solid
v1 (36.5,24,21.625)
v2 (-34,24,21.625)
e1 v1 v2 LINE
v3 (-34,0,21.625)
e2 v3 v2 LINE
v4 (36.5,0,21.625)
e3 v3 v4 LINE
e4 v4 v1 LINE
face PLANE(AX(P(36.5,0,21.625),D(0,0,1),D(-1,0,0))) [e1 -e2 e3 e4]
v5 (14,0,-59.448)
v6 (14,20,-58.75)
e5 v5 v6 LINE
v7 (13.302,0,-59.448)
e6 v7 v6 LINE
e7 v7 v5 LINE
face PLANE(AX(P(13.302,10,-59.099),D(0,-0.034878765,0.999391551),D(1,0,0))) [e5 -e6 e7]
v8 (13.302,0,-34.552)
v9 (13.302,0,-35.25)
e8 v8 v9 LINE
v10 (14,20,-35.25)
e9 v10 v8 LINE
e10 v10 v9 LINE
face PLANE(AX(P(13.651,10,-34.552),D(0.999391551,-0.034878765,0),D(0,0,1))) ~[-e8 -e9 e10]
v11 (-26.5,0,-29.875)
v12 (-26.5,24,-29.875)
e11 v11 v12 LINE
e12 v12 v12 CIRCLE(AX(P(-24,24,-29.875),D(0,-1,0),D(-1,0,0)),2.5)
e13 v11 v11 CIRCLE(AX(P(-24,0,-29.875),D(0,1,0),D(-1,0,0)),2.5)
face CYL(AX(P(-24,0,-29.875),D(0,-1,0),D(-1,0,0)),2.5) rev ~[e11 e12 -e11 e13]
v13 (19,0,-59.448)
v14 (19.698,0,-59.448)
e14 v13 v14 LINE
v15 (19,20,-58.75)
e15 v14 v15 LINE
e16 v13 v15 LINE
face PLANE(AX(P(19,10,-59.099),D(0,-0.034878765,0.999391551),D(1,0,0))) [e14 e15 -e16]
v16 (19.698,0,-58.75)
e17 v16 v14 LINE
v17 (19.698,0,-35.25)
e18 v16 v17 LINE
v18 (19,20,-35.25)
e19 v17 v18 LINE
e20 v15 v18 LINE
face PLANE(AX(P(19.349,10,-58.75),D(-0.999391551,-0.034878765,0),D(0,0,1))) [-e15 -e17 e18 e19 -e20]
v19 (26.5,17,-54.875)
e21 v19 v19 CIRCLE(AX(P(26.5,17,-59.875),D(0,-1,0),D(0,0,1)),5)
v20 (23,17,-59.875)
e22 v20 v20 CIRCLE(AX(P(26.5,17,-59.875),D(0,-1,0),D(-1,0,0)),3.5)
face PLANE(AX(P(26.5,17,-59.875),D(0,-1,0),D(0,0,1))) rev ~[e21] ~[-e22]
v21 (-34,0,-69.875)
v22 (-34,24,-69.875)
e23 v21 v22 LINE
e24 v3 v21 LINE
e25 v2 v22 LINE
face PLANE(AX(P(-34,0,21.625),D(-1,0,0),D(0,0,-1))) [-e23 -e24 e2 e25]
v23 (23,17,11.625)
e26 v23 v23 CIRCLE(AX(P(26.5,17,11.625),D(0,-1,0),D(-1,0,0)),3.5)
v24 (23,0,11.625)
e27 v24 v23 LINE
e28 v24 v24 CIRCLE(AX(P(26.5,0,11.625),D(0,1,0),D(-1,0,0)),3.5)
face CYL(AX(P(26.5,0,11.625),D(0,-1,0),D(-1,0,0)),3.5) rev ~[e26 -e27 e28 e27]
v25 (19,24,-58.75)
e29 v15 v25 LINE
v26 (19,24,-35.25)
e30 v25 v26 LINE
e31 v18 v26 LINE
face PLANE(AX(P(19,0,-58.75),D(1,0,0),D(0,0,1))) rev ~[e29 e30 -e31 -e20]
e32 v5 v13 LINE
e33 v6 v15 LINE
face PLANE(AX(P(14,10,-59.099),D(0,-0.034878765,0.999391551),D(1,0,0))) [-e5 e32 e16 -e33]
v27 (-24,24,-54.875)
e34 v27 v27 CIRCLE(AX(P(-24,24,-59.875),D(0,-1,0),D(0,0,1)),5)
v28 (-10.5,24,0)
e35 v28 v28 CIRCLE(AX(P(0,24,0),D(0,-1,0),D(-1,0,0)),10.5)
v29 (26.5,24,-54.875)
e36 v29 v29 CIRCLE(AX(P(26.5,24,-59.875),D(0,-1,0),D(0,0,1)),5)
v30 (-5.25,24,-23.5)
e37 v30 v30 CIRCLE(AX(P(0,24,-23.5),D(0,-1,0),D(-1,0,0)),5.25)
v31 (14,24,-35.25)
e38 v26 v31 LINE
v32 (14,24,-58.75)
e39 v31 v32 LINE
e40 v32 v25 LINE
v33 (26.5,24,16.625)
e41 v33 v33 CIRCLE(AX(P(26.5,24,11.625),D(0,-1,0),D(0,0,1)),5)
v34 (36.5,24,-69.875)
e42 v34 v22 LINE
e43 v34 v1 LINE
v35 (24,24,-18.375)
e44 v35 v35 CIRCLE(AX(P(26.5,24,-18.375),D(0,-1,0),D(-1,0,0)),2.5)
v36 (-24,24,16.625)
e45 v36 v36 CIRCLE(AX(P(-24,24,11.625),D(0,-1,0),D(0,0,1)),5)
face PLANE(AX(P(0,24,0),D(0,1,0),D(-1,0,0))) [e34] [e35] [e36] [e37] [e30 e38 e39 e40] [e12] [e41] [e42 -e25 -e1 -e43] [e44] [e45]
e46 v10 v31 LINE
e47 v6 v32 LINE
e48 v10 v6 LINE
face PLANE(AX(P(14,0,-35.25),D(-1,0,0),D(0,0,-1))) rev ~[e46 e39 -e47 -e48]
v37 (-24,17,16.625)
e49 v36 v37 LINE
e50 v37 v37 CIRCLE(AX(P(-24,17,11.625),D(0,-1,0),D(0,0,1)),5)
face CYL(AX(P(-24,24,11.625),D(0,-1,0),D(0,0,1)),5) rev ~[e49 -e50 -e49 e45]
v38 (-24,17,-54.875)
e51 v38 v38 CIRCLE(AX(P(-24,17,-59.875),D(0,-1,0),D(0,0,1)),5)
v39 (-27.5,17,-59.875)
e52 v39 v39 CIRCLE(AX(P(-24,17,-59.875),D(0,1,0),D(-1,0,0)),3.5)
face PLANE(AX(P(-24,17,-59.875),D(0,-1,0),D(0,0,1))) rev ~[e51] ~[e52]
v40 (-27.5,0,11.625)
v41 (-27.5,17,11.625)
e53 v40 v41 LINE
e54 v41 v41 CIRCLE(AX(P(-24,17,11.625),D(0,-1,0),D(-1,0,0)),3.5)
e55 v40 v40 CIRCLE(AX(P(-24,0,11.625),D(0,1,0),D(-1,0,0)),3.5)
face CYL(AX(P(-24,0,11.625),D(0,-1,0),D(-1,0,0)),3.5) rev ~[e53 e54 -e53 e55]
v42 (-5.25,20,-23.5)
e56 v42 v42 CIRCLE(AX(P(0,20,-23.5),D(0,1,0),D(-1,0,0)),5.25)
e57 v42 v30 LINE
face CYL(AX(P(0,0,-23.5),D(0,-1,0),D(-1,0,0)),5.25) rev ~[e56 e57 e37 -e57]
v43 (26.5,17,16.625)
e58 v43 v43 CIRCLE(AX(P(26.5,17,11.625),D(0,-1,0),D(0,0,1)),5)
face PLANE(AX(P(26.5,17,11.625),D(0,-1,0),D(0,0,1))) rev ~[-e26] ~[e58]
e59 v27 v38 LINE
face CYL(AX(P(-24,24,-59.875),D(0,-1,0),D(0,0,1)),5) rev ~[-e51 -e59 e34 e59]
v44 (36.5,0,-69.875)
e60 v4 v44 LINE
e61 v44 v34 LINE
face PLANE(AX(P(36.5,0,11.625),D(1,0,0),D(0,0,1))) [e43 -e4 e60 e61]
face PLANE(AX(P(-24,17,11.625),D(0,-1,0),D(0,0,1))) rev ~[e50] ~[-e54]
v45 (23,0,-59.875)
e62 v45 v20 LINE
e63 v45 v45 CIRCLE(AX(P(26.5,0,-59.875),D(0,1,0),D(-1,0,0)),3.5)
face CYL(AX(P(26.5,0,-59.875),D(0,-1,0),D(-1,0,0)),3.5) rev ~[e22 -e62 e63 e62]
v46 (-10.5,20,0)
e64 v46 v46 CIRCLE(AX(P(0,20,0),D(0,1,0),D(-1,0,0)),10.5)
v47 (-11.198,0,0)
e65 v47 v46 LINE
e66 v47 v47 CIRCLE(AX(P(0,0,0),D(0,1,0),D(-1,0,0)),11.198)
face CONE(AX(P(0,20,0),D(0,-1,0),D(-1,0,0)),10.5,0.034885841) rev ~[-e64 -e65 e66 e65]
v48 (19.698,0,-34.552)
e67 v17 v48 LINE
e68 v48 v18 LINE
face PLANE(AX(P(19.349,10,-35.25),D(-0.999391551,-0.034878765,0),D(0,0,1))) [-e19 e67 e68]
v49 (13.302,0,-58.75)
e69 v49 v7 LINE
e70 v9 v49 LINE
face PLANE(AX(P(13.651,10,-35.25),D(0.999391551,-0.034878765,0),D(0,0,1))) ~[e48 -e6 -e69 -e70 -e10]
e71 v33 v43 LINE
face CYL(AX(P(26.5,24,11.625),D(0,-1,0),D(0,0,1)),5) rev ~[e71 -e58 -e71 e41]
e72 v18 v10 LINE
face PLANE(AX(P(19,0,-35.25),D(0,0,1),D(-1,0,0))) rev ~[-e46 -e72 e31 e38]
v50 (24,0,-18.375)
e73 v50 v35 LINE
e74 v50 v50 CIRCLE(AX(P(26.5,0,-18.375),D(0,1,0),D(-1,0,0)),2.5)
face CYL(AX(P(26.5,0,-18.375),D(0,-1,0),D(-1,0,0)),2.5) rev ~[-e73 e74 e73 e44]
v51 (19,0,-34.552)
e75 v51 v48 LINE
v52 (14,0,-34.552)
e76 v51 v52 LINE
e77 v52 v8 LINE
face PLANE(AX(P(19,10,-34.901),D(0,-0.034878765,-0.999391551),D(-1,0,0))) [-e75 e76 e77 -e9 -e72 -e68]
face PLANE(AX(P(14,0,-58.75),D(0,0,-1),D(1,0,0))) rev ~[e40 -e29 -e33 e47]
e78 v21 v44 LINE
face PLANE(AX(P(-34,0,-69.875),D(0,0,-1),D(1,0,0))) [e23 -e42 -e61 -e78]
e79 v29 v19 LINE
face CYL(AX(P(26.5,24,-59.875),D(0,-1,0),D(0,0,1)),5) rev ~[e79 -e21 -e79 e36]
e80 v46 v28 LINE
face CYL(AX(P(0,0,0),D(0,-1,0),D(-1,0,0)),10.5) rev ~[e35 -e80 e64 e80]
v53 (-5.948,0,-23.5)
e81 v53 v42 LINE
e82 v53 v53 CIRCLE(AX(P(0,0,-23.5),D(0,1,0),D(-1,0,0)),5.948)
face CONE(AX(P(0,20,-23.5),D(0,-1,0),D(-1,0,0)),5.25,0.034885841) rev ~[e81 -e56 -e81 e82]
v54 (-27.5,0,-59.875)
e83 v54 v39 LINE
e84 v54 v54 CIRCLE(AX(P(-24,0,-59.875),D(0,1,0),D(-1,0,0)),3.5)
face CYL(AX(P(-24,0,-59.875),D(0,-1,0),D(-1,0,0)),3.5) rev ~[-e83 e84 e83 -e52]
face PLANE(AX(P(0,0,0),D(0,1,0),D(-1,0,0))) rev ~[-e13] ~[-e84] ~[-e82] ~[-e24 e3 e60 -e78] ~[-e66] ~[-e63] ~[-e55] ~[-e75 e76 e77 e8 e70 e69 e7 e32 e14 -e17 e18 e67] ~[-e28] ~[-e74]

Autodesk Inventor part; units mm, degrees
ref_plane "YZ Plane" through (0, 0, 0) normal (1, 0, 0) x (0, 1, 0)
ref_plane "XZ Plane" through (0, 0, 0) normal (0, 1, 0) x (-1, 0, 0)
ref_plane "XY Plane" through (0, 0, 0) normal (0, 0, 1) x (1, 0, 0)
sketch "Sketch1" plane through (0, 0, 0) normal (0, 1, 0) x (-1, 0, 0)
  circle A0 centre (0, 0) radius 10.5
  line L0 (0, 0) -> (0, -23.5)
  circle A1 centre (0, -23.5) radius 5.25
  line L1 (0, -23.5) -> (0, -35.25)
  line L2 (-14, -35.25) -> (-14, -58.75)
  line L3 (-14, -58.75) -> (-19, -58.75)
  line L4 (-19, -58.75) -> (-19, -35.25)
  line L5 (-36.5, 21.625) -> (34, 21.625)
  line L6 (-36.5, 21.625) -> (34, 21.625) construction
  line L7 (34, 21.625) -> (24, 21.625)
  line L8 (-36.5, 21.625) -> (34, 21.625)
  line L9 (34, 21.625) -> (34, -69.875)
  line L10 (34, -69.875) -> (-36.5, -69.875)
  line L11 (-36.5, -69.875) -> (-36.5, 21.625)
  line L12 (-36.5, 21.625) -> (-36.5, 11.625)
  line L13 (-36.5, 11.625) -> (-26.5, 11.625)
  circle A2 centre (-26.5, 11.625) radius 3.5
  line L14 (34, 21.625) -> (24, 21.625)
  line L15 (24, 21.625) -> (24, 11.625)
  circle A3 centre (24, 11.625) radius 3.5
  line L16 (34, -69.875) -> (24, -69.875)
  line L17 (24, -69.875) -> (24, -59.875)
  circle A4 centre (24, -59.875) radius 3.5
  line L18 (-36.5, -69.875) -> (-26.5, -69.875)
  line L19 (-26.5, -69.875) -> (-26.5, -59.875)
  circle A5 centre (-26.5, -59.875) radius 3.5
  line L20 (-26.5, 11.625) -> (-26.5, -18.375)
  line L21 (24, -59.875) -> (24, -29.875)
  circle A6 centre (-26.5, -18.375) radius 2.5
  circle A7 centre (24, -29.875) radius 2.5
  line L22 (-19, -35.25) -> (-14, -35.25)
  dimension "d0" = 21
  dimension "d1" = 23.5
  dimension "d2" = 10.5
  dimension "d3" = 11.75
  dimension "d5" = 23.5
  dimension "d6" = 5
  dimension "d7" = 23.5
  dimension "d9" = 70.5
  dimension "d40" = 21.625
  dimension "d41" = 70.5
  dimension "d42" = 91.5
  dimension "d43" = 10
  dimension "d44" = 10
  dimension "d45" = 7
  dimension "d46" = 10
  dimension "d47" = 10
  dimension "d48" = 90
  dimension "d50" = 7
  dimension "d51" = 10
  dimension "d52" = 10
  dimension "d53" = 7
  dimension "d54" = 10
  dimension "d55" = 10
  dimension "d56" = 7
  dimension "d60" = 30
  dimension "d61" = 30
  dimension "d62" = 5
  dimension "d63" = 5
  dimension "d64" = 14
  dimension "d121" = 34
extrude "Extrusion1" add sketch "Sketch1" along normal blind 24
hole "Hole1" at (-24, 24, -59.875) direction (0, -1, 0) diameter 3 end through all counterbore diameter 10 counterbore depth 7
hole "Hole2" at (26.5, 24, -59.875) direction (0, -1, 0) diameter 3 end through all counterbore diameter 10 counterbore depth 7
hole "Hole3" at (-24, 24, 11.625) direction (0, -1, 0) diameter 3 end through all counterbore diameter 10 counterbore depth 7
hole "Hole4" at (26.5, 24, 11.625) direction (0, -1, 0) diameter 3 end through all counterbore diameter 10 counterbore depth 7
chamfer "Chamfer1" distance 0.698 distance2 20 1 edges at (10.5, 0, 0) measured on face at (-2.5112, 0, -48.5701)
chamfer "Chamfer2" distance 0.698 distance2 20 1 edges at (5.25, 0, -23.5) measured on face at (-2.5112, 0, -48.5701)
chamfer "Chamfer3" distance 0.698 distance2 20 1 edges at (16.5, 0, -35.25) measured on face at (-2.5393, 0, -48.801)
chamfer "Chamfer4" distance 20 distance2 0.698 1 edges at (14, 0, -47) measured on face at (14, 14.6667, -50.9167)
chamfer "Chamfer5" distance 0.698 distance2 20 1 edges at (19, 0, -47) measured on face at (-2.772, 0, -48.801)
chamfer "Chamfer6" distance 0.698 distance2 20 1 edges at (16.5, 0, -58.75) measured on face at (-2.772, 0, -48.801)
properties part number "Matriz"
